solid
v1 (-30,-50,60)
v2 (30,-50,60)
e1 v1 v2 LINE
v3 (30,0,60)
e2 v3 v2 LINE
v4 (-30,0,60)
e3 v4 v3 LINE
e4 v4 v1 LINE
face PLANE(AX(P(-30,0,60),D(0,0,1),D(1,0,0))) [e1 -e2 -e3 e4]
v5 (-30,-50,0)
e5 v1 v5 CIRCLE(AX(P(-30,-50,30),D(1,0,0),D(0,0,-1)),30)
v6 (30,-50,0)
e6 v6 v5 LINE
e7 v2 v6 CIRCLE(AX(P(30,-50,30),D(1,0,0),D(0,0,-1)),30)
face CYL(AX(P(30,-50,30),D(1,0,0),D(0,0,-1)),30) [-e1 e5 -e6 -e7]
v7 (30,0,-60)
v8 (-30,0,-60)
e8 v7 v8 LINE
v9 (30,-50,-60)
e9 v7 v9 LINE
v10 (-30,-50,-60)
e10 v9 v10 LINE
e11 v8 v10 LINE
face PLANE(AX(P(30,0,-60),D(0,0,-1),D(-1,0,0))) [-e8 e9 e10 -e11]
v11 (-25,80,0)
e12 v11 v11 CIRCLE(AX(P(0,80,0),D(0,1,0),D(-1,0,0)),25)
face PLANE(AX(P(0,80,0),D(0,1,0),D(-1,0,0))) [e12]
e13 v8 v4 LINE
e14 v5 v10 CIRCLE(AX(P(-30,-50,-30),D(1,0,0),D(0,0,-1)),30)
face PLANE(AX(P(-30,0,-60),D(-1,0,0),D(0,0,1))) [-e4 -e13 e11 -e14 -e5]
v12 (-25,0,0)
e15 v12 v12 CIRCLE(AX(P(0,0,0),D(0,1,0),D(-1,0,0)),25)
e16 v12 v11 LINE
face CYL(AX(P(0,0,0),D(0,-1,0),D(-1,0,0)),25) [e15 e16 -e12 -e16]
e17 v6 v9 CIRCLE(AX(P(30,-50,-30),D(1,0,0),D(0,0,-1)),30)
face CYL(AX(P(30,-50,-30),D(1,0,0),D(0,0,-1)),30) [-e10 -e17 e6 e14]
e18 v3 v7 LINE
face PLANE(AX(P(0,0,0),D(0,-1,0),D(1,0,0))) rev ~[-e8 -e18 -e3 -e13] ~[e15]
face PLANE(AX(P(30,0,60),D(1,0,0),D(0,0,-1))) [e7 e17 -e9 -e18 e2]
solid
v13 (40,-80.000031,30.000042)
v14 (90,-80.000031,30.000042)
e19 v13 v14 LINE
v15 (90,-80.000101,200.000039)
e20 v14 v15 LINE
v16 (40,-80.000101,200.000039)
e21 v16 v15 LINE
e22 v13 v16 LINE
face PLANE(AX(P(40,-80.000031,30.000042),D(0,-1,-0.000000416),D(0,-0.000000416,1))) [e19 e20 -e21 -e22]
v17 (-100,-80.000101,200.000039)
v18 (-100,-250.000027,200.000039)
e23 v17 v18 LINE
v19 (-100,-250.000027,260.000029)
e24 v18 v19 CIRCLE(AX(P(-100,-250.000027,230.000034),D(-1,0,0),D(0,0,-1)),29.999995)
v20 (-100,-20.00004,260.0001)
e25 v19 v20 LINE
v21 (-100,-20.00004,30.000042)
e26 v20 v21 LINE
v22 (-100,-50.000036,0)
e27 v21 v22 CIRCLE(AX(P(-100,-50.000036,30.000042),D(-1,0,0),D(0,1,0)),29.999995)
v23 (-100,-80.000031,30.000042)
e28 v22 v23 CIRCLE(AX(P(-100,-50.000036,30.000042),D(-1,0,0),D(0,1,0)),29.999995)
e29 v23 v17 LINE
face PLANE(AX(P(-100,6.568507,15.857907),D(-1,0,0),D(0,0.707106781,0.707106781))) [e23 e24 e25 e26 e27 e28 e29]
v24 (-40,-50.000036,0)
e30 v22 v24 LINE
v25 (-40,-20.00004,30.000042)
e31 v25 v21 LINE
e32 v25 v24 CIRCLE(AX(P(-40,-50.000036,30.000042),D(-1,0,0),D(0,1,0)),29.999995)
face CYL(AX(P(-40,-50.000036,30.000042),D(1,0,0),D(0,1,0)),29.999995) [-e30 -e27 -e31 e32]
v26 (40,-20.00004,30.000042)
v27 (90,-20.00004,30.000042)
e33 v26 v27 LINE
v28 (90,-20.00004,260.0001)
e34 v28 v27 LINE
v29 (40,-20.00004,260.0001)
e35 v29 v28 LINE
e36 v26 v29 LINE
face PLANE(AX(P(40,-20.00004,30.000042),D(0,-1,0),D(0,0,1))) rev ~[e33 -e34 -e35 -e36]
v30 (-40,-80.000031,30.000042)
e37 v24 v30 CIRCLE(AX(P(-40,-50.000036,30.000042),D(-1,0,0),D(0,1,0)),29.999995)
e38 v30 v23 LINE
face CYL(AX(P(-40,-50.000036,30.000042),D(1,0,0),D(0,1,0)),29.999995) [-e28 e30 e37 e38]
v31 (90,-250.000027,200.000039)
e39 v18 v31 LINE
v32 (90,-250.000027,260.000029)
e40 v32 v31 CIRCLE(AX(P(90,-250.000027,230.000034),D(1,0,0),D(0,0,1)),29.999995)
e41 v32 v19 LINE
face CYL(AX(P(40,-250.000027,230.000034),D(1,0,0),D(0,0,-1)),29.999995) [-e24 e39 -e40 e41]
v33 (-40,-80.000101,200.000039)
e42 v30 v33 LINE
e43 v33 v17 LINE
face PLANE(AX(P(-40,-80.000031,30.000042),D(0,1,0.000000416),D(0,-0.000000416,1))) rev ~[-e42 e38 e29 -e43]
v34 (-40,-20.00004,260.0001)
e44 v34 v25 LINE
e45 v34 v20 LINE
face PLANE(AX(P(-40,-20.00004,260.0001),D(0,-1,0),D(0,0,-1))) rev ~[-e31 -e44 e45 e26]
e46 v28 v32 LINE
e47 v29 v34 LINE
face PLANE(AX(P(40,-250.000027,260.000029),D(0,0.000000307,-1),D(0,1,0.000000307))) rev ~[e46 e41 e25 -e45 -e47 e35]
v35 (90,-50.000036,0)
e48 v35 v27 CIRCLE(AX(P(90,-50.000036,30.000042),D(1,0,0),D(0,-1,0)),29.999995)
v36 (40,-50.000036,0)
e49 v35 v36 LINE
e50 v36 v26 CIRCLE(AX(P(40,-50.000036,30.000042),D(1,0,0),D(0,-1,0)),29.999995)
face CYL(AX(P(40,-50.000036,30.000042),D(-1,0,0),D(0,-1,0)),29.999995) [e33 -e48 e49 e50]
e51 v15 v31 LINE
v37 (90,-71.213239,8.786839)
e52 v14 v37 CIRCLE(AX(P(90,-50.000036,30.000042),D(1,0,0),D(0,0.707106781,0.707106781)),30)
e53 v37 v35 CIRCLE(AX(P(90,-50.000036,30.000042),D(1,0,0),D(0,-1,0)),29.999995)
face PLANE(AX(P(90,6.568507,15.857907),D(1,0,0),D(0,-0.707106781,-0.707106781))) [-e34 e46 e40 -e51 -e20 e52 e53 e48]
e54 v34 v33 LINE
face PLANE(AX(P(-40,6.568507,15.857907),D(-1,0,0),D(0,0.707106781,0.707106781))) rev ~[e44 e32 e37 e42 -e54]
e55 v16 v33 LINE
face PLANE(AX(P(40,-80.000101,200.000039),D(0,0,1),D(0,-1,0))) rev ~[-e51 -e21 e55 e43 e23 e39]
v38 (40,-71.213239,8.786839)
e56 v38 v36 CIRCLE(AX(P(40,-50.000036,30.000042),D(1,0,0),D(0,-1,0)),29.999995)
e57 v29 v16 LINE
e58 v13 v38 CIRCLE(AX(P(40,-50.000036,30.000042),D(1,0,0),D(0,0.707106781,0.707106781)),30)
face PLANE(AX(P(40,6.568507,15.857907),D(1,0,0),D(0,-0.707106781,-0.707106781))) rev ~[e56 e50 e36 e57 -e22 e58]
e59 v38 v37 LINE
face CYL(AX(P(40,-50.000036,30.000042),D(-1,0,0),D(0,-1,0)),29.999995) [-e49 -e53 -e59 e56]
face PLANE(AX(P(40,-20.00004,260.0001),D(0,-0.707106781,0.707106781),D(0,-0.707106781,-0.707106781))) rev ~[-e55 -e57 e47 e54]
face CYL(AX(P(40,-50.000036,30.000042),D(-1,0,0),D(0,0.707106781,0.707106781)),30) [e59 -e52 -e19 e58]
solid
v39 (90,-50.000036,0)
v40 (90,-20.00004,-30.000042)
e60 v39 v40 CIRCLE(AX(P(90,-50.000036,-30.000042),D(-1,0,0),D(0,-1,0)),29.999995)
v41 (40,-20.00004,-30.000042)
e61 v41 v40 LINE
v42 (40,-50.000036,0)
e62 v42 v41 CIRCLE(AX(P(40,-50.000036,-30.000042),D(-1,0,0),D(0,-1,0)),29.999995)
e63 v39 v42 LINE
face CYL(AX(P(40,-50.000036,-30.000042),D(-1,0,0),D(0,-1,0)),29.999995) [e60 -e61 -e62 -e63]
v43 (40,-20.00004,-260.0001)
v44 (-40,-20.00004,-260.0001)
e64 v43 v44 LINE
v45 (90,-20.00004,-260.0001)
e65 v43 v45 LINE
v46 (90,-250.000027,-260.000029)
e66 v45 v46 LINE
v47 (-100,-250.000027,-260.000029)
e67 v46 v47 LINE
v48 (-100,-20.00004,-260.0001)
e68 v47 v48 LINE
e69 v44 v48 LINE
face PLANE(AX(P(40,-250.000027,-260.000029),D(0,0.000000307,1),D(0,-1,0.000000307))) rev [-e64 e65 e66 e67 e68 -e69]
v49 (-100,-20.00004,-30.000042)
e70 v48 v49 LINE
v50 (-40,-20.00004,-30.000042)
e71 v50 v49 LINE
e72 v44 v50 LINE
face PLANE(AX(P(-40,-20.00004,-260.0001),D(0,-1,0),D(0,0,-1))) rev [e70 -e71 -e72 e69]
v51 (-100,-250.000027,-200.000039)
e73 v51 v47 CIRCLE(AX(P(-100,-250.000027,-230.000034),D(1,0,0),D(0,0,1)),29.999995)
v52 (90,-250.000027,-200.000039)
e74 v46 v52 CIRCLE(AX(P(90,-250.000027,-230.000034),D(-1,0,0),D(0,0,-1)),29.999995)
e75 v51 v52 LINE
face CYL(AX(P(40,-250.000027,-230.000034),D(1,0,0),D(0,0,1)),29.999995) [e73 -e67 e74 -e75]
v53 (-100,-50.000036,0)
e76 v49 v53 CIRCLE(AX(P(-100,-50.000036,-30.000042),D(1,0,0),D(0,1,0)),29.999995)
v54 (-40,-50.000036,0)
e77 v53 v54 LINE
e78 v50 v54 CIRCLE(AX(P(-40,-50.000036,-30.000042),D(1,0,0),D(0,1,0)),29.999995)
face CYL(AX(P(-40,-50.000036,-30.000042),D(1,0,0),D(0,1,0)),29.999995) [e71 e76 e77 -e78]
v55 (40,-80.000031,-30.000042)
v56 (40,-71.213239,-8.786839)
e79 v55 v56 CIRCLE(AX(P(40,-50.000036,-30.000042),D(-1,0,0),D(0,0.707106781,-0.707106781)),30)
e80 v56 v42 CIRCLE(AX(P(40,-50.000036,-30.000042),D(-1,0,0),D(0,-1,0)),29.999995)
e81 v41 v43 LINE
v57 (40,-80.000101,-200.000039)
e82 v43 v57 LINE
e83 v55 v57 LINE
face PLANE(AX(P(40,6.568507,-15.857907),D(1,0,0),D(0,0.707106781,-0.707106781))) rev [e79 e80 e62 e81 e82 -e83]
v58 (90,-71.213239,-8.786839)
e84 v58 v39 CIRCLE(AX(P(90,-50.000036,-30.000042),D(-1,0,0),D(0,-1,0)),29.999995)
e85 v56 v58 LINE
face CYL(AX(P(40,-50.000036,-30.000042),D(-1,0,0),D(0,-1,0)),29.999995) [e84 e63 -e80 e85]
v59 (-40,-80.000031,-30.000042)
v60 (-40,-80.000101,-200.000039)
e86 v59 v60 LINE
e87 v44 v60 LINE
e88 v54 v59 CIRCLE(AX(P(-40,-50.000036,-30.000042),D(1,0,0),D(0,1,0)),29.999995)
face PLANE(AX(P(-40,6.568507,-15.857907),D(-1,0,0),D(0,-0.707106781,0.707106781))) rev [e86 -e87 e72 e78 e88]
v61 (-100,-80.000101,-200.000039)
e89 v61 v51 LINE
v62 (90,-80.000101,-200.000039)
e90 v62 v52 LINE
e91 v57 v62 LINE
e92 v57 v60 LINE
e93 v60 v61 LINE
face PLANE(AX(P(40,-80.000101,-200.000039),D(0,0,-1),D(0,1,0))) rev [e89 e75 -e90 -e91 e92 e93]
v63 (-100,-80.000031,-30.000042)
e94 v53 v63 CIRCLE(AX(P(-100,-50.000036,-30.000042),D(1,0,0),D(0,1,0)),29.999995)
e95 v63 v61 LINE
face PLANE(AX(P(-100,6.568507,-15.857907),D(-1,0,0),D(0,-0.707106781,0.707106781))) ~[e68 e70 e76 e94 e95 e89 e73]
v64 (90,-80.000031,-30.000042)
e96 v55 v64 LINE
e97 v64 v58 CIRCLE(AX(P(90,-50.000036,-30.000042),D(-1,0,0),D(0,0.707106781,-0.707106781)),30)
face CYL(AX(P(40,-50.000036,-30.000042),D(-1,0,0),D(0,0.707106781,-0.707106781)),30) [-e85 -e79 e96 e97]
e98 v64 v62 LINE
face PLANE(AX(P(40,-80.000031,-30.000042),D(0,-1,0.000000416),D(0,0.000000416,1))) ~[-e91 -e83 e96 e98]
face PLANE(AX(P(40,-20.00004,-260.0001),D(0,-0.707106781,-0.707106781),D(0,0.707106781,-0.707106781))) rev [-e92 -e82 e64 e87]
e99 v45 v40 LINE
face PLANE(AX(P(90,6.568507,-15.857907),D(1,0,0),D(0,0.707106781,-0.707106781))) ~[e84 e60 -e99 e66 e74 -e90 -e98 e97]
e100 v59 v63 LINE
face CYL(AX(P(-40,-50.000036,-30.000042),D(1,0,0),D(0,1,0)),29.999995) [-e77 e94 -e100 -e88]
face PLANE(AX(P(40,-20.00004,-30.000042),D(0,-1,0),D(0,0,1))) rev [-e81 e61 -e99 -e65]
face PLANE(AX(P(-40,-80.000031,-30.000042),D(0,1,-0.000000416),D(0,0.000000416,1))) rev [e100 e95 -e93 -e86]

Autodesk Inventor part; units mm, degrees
ref_plane "YZ Plane" through (0, 0, 0) normal (1, 0, 0) x (0, 1, 0)
ref_plane "XZ Plane" through (0, 0, 0) normal (0, 1, 0) x (-1, 0, 0)
sketch "草圖1" plane through (0, 0, 0) normal (0, 1, 0) x (-1, 0, 0)
  circle A0 centre (0, 0) radius 25
  dimension "d0" = 50
extrude "擠出1" add sketch "草圖1" along normal blind 80
sketch "草圖2" plane through (0, 0, 0) normal (0, -1, 0) x (1, 0, 0)
  line L0 (30, -60) -> (-30, -60)
  line L1 (-30, -60) -> (-30, 60)
  line L2 (-30, 60) -> (30, 60)
  line L3 (30, 60) -> (30, -60)
  line L4 (30, -60) -> (-30, 60) construction
  line L5 (-30, -60) -> (30, 60) construction
  point P0 (0, 0)
  dimension "d3" = 120
  dimension "d4" = 60
extrude "擠出2" add sketch "草圖2" along normal blind 50
sketch "草圖3" plane through (30, 0, 60) normal (1, 0, 0) x (0, 0, -1)
  line L0 (120, -50) -> (0, -50) projected
  circle A0 centre (30, -50) radius 30
  circle A1 centre (90, -50) radius 30
  point P0 (60, 0)
  dimension "d8" = 60
  dimension "d7" = 60
extrude "擠出3" add sketch "草圖3" against normal up to surface (60 mm away)
ref_plane "工作平面1" through (40, 0, 60) normal (1, 0, 0) x (0, 0, -1)
sketch "草圖4" plane through (40, 0, 60) normal (1, 0, 0) x (0, 0, -1)
  arc A0 (0, -50) -> (60, -50) centre (30, -50) ccw projected
  line L0 (30, -50) -> (-111.4214, -191.4214)
  line L1 (-111.4214, -191.4214) -> (30, -332.8427)
  line L2 (0, 0) -> (0, -50) projected
  line L3 (51.2132, -71.2132) -> (-68.9949, -191.4214)
  line L4 (-68.9949, -191.4214) -> (51.2132, -311.6295)
  line L5 (8.7868, -28.7868) -> (-153.8478, -191.4214)
  line L6 (-153.8478, -191.4214) -> (8.7868, -354.0559)
  arc A1 (51.2132, -71.2132) -> (8.7868, -28.7868) centre (30, -50) ccw
  arc A2 (8.7868, -354.0559) -> (51.2132, -311.6295) centre (30, -332.8427) ccw
  point P0 (60, 0)
  dimension "d12" = 90
  dimension "d13" = 45
  dimension "d14" = 200
  dimension "d15" = 30
  dimension "d16" = 30
  dimension "d17" = 60
  dimension "d18" = 60
extrude "擠出4" add sketch "草圖4" along normal blind 50 separate body
sketch "草圖8" plane through (40, 0, 60) normal (-1, 0, 0) x (0, 0, 1)
  line L0 (-8.7868, -354.0559) -> (153.8478, -191.4214) projected
  line L1 (68.9949, -191.4214) -> (-51.2132, -311.6295) projected
  arc A0 (-51.2132, -311.6295) -> (-8.7868, -354.0559) centre (-30, -332.8427) ccw projected
  line L2 (153.8478, -191.4214) -> (-8.7868, -354.0559) projected
  line L3 (153.8478, -191.4214) -> (68.9949, -191.4214)
  point P0 (-60, 0)
extrude "擠出7" add sketch "草圖8" along normal blind 80 bodies 2
sketch "草圖9" plane through (-40, 0, 60) normal (-1, 0, 0) x (0, 0, 1)
  line L0 (68.9949, -191.4214) -> (153.8478, -191.4214) projected
  line L1 (153.8478, -191.4214) -> (-8.7868, -28.7868) projected
  arc A0 (-8.7868, -28.7868) -> (-51.2132, -71.2132) centre (-30, -50) ccw projected
  line L2 (-51.2132, -71.2132) -> (68.9949, -191.4214) projected
  line L3 (-8.7868, -354.0559) -> (153.8478, -191.4214) projected
  line L4 (153.8478, -191.4214) -> (68.9949, -191.4214) projected
  line L5 (68.9949, -191.4214) -> (-51.2132, -311.6295) projected
  arc A1 (-51.2132, -311.6295) -> (-8.7868, -354.0559) centre (-30, -332.8427) ccw projected
  point P0 (-60, 0)
extrude "擠出8" add sketch "草圖9" along normal blind 60 bodies 2
move or copy body "旋轉1" bodies to move or copy 2 copy no rotation origin (0, 0, 0) rotation axis (1, 0, 0) rotation angle -45 translate (0, -35.8579, -26.5685)
mirror "鏡射1" about plane through (0, 0, 0) normal (0, 0, 1) bodies 2
properties part number "夾爪"
